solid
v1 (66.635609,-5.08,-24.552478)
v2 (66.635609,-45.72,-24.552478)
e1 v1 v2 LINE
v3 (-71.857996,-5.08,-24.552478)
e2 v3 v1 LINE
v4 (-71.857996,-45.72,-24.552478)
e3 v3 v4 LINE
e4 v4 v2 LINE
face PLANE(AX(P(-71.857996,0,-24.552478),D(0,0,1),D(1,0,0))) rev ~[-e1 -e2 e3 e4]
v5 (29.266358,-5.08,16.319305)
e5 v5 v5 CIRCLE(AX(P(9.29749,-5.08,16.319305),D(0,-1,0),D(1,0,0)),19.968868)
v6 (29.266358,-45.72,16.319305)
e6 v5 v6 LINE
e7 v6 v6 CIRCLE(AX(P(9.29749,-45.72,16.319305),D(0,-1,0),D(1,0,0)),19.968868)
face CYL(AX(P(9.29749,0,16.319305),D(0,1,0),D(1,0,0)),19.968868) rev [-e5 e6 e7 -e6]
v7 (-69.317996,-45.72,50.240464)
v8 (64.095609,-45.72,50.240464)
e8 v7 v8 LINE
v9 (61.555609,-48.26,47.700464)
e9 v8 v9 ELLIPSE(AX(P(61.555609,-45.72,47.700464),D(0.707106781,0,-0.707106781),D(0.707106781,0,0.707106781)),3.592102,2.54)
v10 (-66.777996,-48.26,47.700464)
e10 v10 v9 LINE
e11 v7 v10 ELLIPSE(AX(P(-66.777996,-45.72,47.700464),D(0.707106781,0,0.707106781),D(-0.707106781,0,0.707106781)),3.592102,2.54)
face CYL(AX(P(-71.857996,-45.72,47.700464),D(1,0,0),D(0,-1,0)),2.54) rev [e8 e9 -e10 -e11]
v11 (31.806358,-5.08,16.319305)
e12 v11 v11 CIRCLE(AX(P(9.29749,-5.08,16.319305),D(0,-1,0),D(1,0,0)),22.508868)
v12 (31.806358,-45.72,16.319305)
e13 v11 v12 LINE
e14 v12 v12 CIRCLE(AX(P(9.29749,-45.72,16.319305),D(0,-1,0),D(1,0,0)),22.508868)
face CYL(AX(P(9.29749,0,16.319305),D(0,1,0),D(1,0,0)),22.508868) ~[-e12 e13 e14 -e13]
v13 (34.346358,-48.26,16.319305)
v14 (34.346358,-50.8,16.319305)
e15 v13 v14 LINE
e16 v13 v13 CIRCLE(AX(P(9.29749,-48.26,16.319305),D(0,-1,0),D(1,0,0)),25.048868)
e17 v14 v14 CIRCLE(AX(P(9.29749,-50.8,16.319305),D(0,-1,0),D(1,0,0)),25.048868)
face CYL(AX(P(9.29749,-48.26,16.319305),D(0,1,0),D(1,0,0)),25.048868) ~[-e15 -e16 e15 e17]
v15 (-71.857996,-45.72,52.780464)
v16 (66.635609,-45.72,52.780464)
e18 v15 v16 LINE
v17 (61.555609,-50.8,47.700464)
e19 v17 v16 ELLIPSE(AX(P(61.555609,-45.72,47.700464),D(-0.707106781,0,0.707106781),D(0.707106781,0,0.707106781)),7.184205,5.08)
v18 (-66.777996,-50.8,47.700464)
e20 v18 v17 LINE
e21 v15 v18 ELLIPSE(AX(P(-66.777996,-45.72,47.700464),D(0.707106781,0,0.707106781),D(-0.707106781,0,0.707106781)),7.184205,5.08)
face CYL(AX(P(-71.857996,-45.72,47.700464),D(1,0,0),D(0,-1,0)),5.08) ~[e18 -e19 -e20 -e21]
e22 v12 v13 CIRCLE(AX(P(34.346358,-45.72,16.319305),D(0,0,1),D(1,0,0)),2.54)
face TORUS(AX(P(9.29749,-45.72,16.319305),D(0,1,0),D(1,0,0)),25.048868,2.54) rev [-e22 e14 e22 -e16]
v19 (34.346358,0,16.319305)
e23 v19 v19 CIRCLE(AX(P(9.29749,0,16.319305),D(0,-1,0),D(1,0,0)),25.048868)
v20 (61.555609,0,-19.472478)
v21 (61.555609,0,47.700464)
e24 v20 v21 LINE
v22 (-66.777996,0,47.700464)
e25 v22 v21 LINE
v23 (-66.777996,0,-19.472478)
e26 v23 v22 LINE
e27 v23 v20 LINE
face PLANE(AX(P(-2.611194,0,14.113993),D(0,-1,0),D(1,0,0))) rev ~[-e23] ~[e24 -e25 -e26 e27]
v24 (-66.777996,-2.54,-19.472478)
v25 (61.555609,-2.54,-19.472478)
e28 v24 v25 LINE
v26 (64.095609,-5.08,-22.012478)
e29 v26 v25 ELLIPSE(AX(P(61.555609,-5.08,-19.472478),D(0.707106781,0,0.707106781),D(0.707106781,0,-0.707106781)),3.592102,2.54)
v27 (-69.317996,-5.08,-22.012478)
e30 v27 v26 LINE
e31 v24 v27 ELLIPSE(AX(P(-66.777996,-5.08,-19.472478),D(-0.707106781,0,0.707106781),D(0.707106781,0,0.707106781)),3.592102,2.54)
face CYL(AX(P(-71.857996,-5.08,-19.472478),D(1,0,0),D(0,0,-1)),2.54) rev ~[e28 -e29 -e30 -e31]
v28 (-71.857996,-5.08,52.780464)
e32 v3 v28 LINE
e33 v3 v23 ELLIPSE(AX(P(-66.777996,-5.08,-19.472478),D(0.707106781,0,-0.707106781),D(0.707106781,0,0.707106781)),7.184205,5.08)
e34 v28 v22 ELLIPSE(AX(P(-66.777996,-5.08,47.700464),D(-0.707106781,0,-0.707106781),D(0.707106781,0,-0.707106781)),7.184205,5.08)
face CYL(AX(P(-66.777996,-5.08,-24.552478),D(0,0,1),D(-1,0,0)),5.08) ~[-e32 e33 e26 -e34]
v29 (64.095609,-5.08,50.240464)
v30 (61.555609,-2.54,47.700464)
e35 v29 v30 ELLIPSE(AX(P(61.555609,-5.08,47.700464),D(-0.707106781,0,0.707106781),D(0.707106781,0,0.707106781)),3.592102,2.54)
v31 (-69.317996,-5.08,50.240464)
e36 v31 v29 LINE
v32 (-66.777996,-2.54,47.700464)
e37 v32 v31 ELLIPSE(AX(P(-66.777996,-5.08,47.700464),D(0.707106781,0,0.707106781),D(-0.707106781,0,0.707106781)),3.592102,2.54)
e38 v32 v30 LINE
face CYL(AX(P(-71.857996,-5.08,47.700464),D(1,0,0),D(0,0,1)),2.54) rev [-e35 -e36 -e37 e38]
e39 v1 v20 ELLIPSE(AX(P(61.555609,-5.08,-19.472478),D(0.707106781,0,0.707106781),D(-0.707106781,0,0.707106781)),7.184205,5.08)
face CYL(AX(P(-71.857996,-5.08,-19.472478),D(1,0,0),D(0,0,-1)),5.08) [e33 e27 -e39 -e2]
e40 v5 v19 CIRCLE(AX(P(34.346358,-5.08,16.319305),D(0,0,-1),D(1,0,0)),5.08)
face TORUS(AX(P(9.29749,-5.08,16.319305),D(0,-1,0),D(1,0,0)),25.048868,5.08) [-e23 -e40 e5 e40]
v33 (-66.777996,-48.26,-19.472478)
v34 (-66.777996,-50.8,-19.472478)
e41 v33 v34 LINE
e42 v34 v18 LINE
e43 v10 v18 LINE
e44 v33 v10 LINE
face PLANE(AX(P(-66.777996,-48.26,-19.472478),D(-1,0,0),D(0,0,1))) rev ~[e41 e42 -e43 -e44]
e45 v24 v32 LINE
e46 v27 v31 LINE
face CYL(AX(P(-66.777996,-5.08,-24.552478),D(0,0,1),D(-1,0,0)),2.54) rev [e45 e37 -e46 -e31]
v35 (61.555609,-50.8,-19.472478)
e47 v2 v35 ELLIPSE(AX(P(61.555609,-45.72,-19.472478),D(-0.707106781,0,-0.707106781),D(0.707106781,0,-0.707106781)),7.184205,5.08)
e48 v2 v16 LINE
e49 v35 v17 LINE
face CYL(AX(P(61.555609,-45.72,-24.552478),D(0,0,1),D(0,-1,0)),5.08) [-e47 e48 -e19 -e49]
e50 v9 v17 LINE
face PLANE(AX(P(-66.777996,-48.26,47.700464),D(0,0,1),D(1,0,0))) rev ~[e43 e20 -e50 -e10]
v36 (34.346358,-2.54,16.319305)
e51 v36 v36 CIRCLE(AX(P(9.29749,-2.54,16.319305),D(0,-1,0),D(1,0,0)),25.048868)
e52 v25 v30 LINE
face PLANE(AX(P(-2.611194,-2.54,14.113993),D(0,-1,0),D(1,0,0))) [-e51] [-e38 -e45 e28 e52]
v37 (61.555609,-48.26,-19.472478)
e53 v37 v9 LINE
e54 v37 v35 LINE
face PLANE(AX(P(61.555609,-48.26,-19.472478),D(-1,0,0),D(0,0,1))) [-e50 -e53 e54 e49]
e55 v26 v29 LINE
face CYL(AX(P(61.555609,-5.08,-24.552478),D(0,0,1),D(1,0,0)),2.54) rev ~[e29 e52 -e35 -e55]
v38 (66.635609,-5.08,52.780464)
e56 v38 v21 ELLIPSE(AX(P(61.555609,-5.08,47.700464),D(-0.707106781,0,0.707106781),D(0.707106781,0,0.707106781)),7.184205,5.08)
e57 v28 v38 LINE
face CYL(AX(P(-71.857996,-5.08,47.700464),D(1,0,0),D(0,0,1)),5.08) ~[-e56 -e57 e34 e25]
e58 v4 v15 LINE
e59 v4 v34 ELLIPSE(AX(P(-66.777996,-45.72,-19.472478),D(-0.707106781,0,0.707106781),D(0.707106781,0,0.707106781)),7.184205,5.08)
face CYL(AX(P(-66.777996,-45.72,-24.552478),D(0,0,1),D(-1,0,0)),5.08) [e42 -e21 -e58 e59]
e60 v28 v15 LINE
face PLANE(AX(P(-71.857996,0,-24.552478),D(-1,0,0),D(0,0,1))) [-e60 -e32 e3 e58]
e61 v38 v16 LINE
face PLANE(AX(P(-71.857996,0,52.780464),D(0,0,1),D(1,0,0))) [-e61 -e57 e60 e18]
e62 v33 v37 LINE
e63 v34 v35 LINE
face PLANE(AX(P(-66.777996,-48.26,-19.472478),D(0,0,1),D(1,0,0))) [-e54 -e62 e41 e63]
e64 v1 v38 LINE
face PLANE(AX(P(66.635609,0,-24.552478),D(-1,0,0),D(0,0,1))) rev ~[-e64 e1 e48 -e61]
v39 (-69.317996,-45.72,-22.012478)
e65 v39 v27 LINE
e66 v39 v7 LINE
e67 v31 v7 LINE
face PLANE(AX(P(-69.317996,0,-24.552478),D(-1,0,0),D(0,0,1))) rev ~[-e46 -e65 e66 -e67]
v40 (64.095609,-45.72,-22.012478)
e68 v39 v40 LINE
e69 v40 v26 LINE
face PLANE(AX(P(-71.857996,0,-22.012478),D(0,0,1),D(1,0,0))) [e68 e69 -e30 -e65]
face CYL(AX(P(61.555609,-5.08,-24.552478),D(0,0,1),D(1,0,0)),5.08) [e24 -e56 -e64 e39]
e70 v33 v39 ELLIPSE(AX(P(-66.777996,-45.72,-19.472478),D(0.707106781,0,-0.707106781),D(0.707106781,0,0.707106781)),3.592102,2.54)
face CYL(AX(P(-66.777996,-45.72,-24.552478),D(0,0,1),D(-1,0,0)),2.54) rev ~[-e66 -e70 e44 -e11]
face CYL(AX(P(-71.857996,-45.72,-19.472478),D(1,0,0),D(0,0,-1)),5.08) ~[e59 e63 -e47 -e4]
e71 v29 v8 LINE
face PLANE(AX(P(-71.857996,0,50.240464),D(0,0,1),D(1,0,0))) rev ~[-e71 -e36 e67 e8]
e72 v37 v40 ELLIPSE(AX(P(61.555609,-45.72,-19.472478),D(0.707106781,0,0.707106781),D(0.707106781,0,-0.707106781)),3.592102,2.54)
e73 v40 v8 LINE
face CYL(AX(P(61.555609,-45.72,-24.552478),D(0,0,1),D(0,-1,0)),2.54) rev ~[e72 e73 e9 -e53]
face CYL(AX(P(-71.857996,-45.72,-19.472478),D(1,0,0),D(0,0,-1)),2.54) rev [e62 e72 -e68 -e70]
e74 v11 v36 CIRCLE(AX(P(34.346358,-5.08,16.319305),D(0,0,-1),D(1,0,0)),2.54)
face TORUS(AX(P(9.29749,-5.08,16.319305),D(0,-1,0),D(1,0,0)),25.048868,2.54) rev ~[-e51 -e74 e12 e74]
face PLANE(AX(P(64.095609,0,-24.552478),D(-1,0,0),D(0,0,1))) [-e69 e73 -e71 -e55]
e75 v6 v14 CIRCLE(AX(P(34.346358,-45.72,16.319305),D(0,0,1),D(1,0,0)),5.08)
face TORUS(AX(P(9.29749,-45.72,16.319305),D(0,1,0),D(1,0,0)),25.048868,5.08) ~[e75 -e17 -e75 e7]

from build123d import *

# Parameters (mm, degrees)
F0_W     = 138.4936049581
F0_H     = 77.3329418153
F0_R     = 19.9688682615
F1_DEPTH = 50.8
F2_R     = 5.08
F3_R     = 5.08
F4_T     = -2.54


# Not quite as in the source:
# - a shell that OpenCascade refuses in one call is made with other operations: the cavity is built on its own and cut out


with BuildPart() as f1:
    # F0 (on Front) → F1 (new body)
    with BuildSketch(Plane.XZ):
        with Locations((-2.6111938059, 14.1139933839)):
            Rectangle(F0_W, F0_H)
        with Locations((9.2974901199, 16.3193047047)):
            Circle(F0_R, mode=Mode.SUBTRACT)
    extrude(amount=F1_DEPTH)

    # F2
    f2_edges = [f1.edges().sort_by_distance(p)[0] for p in [
        (66.635609, 0, 14.113993),
        (-2.611194, 0, 52.780464),
        (-71.857996, 0, 14.113993),
        (-2.611194, 0, -24.552478),
        (-10.671378, 0, 16.319305),
        (-10.671378, -50.8, 16.319305),
    ]]
    fillet(f2_edges, radius=F2_R)

    # F3
    f3_edges = [f1.edges().sort_by_distance(p)[0] for p in [
        (-2.611194, -50.8, -24.552478),
        (-71.857996, -50.8, 14.113993),
        (-2.611194, -50.8, 52.780464),
        (66.635609, -50.8, 14.113993),
    ]]
    fillet(f3_edges, radius=F3_R)

    # F4: a shell. OpenCascade refuses it in one call, so the cavity is built on its own and cut out:
    # the body offset inwards by the wall thickness, plus a prism from it out through each open face.
    f4_core = offset(f1.part, amount=F4_T, mode=Mode.PRIVATE)
    f4_exits = [f4_core.faces().sort_by_distance(p)[0] for p in [
        (-2.611194, -48.26, -18.023971),
    ]]
    add(f4_core, mode=Mode.SUBTRACT)
    extrude(f4_exits, amount=-F4_T, mode=Mode.SUBTRACT)


solid = f1.part
